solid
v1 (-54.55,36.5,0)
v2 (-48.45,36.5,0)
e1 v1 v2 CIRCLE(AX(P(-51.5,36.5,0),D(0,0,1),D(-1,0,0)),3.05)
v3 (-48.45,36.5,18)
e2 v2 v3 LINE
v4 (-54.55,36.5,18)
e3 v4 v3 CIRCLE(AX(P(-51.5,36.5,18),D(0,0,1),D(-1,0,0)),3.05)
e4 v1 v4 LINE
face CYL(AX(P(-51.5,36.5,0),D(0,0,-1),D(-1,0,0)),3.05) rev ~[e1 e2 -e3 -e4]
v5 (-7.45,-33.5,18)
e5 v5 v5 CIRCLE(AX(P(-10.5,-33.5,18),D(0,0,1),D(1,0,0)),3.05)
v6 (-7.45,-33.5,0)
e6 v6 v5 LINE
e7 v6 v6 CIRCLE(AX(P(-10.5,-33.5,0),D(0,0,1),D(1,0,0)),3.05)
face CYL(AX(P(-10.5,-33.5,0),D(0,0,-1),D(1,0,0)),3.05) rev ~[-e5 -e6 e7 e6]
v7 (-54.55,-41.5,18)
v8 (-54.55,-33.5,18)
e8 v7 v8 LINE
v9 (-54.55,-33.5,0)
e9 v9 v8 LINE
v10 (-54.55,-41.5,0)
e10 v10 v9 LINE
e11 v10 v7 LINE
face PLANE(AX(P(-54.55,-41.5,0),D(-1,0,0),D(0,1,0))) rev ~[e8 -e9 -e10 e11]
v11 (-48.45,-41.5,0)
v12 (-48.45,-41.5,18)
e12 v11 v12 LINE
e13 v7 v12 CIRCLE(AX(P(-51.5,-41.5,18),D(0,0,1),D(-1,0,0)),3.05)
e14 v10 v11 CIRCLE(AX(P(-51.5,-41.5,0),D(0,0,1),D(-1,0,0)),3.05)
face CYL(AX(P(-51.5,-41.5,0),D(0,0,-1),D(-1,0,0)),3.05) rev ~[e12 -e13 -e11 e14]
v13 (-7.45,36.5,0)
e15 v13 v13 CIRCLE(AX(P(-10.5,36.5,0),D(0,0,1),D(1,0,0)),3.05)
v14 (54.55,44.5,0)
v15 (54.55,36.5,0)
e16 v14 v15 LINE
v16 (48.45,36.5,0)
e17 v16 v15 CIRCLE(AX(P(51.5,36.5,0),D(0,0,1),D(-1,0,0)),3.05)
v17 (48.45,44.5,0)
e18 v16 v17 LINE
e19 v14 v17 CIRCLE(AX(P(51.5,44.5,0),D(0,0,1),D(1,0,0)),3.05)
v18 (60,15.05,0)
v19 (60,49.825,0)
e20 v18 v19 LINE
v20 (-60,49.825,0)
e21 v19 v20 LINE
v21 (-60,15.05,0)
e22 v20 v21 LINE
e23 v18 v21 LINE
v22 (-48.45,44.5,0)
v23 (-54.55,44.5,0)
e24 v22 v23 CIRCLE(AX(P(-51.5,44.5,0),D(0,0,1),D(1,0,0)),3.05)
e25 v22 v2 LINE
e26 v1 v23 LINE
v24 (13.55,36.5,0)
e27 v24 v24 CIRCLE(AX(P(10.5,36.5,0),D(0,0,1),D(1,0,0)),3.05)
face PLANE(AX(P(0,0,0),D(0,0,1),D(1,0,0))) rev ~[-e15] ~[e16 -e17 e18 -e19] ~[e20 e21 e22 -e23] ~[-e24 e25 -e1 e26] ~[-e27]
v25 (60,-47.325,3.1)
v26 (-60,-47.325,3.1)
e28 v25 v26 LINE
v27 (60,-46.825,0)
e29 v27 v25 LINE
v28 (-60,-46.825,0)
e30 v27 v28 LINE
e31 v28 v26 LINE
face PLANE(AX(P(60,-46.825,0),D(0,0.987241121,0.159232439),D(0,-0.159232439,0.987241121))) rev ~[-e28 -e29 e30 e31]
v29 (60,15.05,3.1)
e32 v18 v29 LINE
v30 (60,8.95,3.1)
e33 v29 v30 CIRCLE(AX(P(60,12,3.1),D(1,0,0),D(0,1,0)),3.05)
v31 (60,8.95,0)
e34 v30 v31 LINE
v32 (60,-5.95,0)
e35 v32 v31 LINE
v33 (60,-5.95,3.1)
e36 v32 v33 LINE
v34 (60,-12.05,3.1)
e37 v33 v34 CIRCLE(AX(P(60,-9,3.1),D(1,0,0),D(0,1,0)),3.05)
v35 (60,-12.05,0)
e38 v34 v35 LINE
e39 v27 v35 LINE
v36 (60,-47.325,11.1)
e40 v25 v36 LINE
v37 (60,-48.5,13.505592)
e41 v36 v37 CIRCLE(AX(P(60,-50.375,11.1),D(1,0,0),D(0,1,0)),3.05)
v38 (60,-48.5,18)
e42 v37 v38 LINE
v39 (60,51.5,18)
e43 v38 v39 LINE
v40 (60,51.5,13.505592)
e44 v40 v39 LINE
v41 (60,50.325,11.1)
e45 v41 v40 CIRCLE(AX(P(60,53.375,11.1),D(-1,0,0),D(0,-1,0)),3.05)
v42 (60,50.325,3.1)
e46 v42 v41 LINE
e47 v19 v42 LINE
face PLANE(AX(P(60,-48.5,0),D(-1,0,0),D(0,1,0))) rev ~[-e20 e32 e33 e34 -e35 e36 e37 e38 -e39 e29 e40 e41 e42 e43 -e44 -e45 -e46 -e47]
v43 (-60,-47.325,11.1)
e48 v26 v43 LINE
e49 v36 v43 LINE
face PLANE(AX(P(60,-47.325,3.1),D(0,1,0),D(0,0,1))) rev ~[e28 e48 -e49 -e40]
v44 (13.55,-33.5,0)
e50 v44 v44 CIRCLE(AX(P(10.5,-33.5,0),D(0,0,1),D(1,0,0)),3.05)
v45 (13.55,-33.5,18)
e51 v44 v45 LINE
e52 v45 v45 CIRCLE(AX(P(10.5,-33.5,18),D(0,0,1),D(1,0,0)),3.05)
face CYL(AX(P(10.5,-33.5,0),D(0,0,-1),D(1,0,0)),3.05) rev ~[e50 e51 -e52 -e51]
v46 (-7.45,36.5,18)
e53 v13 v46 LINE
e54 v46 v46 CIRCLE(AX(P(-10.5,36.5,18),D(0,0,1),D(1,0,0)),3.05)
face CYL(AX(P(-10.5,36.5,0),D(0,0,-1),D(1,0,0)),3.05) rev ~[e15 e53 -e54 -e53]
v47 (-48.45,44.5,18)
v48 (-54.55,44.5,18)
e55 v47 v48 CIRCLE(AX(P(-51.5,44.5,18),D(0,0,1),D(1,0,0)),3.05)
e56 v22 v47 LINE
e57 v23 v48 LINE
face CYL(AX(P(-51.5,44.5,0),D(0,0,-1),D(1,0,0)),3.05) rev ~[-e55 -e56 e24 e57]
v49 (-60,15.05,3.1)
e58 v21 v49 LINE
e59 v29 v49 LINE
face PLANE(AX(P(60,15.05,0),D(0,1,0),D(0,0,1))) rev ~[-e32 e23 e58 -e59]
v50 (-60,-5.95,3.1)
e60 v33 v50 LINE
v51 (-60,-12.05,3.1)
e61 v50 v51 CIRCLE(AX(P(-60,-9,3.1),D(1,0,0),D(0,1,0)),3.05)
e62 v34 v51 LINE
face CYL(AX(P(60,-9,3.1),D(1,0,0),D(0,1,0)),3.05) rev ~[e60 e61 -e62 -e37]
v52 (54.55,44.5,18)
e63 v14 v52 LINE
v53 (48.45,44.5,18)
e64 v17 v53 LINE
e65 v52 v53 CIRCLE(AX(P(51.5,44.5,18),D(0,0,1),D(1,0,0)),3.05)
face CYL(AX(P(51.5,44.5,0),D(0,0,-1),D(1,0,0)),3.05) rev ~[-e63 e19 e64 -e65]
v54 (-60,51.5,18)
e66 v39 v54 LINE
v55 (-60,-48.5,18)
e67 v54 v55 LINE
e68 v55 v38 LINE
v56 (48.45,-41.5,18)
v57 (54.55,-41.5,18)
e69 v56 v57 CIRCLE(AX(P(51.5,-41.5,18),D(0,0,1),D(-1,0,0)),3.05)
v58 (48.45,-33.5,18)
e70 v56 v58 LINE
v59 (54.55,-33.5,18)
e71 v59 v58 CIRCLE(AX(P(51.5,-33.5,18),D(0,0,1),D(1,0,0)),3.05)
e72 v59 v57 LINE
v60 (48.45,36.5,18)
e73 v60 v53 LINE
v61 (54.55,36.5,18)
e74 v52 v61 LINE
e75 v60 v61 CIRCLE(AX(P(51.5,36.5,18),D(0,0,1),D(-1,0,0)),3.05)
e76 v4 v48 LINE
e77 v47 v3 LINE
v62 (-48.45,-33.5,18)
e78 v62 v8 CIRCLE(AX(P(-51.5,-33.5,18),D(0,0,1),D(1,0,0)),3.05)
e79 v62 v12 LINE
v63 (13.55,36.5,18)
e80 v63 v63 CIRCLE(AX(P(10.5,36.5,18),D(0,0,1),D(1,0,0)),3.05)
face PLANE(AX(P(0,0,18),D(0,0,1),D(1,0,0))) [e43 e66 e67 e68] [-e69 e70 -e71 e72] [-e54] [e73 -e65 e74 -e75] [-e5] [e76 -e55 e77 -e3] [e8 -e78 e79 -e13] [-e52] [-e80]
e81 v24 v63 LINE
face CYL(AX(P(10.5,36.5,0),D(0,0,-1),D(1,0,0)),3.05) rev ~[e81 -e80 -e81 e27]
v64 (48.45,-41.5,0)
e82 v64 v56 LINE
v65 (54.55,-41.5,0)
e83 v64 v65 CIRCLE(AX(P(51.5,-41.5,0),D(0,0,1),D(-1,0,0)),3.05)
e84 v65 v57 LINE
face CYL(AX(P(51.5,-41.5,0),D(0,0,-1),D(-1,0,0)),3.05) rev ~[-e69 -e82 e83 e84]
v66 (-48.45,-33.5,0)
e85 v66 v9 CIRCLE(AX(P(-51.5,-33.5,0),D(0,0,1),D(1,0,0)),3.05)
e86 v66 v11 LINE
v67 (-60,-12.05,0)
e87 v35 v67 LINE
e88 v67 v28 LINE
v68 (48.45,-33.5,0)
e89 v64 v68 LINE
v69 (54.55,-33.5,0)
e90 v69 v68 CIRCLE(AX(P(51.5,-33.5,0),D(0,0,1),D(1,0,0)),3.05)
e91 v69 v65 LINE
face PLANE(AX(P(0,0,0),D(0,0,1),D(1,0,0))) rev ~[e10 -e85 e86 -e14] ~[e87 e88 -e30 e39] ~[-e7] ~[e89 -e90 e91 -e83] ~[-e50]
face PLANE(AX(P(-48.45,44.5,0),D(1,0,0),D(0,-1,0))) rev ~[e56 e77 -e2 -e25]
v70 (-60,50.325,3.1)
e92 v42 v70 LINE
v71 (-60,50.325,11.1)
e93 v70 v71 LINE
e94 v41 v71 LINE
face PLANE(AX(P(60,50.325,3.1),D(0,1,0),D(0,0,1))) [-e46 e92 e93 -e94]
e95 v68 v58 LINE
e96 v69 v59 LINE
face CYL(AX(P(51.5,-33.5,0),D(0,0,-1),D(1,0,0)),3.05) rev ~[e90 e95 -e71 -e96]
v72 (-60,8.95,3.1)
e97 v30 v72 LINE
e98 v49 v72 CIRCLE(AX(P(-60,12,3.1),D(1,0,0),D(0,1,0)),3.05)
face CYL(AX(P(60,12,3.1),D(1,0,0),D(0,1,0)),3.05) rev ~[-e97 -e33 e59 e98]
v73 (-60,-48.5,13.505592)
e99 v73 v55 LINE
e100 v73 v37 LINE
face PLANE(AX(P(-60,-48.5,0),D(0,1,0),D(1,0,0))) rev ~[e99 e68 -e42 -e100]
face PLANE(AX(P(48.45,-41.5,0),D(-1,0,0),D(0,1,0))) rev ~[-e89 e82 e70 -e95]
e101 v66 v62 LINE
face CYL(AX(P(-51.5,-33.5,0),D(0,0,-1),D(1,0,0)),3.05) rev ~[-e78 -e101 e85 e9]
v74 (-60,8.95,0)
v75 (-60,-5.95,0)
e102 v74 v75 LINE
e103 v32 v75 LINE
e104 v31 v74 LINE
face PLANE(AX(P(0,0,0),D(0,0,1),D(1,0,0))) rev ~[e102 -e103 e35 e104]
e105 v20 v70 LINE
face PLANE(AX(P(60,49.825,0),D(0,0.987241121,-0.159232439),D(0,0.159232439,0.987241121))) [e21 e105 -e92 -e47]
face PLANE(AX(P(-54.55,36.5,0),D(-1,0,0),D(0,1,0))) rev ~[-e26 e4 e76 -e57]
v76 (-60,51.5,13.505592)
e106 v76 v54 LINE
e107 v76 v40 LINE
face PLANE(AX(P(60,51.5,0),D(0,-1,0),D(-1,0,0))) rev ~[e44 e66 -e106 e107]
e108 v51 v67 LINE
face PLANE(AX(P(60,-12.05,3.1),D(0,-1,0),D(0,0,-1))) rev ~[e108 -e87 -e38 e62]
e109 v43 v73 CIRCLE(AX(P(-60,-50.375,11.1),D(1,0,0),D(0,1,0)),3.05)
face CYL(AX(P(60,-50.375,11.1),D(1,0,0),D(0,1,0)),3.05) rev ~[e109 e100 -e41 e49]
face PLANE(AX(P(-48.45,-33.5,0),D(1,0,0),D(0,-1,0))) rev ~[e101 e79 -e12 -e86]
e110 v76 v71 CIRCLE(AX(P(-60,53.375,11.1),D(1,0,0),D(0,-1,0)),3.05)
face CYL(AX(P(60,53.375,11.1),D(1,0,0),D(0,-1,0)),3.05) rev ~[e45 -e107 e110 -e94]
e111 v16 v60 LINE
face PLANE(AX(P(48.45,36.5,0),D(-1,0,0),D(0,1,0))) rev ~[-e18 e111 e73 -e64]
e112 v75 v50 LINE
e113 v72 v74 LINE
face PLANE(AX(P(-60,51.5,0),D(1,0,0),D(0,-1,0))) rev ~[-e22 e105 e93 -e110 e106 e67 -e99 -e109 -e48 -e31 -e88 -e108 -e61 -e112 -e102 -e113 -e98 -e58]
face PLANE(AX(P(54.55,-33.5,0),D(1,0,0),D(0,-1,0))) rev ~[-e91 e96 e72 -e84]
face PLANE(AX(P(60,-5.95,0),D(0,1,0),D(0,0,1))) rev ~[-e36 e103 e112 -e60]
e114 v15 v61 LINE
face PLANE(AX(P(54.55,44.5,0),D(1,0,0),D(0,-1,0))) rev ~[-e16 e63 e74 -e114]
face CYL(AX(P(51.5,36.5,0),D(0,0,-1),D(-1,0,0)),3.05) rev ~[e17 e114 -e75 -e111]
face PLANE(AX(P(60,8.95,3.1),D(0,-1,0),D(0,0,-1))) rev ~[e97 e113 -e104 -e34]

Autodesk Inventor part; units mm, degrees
ref_plane "YZ Plane" through (0, 0, 0) normal (1, 0, 0) x (0, 1, 0)
ref_plane "XZ Plane" through (0, 0, 0) normal (0, 1, 0) x (-1, 0, 0)
ref_plane "XY Plane" through (0, 0, 0) normal (0, 0, 1) x (1, 0, 0)
sketch "Sketch1" plane through (0, 0, 0) normal (0, 0, 1) x (1, 0, 0)
  circle A0 centre (10.5, 36.5) radius 3.05 projected
  circle A1 centre (-10.5, 36.5) radius 3.05 projected
  circle A2 centre (-10.5, -33.5) radius 3.05 projected
  circle A3 centre (10.5, -33.5) radius 3.05 projected
  line L0 (60, 51.5) -> (-60, 51.5) projected
  line L1 (-60, 51.5) -> (-60, -48.5) projected
  line L2 (-60, -48.5) -> (60, -48.5) projected
  line L3 (60, -48.5) -> (60, 51.5) projected
  circle A4 centre (51.5, 8.625) radius 3.05 projected
  circle A5 centre (-51.5, -5.625) radius 3.05 projected
  circle A6 centre (51.5, -5.625) radius 3.05 projected
  circle A7 centre (-51.5, 8.625) radius 3.05 projected
  arc A8 (-54.55, 36.5) -> (-48.45, 36.5) centre (-51.5, 36.5) ccw projected
  arc A9 (48.45, 36.5) -> (54.55, 36.5) centre (51.5, 36.5) ccw projected
  arc A10 (54.55, -33.5) -> (48.45, -33.5) centre (51.5, -33.5) ccw projected
  arc A11 (-48.45, -33.5) -> (-54.55, -33.5) centre (-51.5, -33.5) ccw projected
  arc A12 (-13.55, 8.625) -> (-7.45, 8.625) centre (-10.5, 8.625) ccw projected
  arc A13 (13.55, -5.625) -> (7.45, -5.625) centre (10.5, -5.625) ccw projected
  arc A14 (-7.45, -5.625) -> (-13.55, -5.625) centre (-10.5, -5.625) ccw projected
  arc A15 (7.45, 8.625) -> (13.55, 8.625) centre (10.5, 8.625) ccw projected
  line L4 (-48.45, -33.5) -> (-48.45, -41.5) projected
  arc A16 (-54.55, -41.5) -> (-48.45, -41.5) centre (-51.5, -41.5) ccw projected
  line L5 (-54.55, -41.5) -> (-54.55, -33.5) projected
  line L6 (54.55, -33.5) -> (54.55, -41.5) projected
  arc A17 (48.45, -41.5) -> (54.55, -41.5) centre (51.5, -41.5) ccw projected
  line L7 (48.45, -41.5) -> (48.45, -33.5) projected
  line L8 (-54.55, 36.5) -> (-54.55, 44.5) projected
  arc A18 (-48.45, 44.5) -> (-54.55, 44.5) centre (-51.5, 44.5) ccw projected
  line L9 (-48.45, 44.5) -> (-48.45, 36.5) projected
  line L10 (-7.45, -5.625) -> (-7.45, -13.625) projected
  arc A19 (-13.55, -13.625) -> (-7.45, -13.625) centre (-10.5, -13.625) ccw projected
  line L11 (-13.55, -13.625) -> (-13.55, -5.625) projected
  line L12 (13.55, -5.625) -> (13.55, -13.625) projected
  arc A20 (7.45, -13.625) -> (13.55, -13.625) centre (10.5, -13.625) ccw projected
  line L13 (7.45, -13.625) -> (7.45, -5.625) projected
  line L14 (13.55, 16.625) -> (13.55, 8.625) projected
  line L15 (7.45, 8.625) -> (7.45, 16.625) projected
  arc A21 (13.55, 16.625) -> (7.45, 16.625) centre (10.5, 16.625) ccw projected
  line L16 (54.55, 44.5) -> (54.55, 36.5) projected
  line L17 (48.45, 36.5) -> (48.45, 44.5) projected
  arc A22 (54.55, 44.5) -> (48.45, 44.5) centre (51.5, 44.5) ccw projected
  line L18 (-7.45, 16.625) -> (-7.45, 8.625) projected
  line L19 (-13.55, 8.625) -> (-13.55, 16.625) projected
  arc A23 (-7.45, 16.625) -> (-13.55, 16.625) centre (-10.5, 16.625) ccw projected
  point P0 (0, 0)
  point P1 (-51.375, 35)
  point P2 (51.375, 35)
  point P3 (51.375, -35)
  point P4 (-51.375, -35)
  point P5 (-10.5, 7.125)
  point P6 (10.5, -7.125)
  point P7 (-10.5, -7.125)
  point P8 (10.5, 7.125)
extrude "Extrusion1" add sketch "Sketch1" along normal blind 18 contours L3 L2 L1 L0 | A4 | A5 | A6 | A7 | L19 A23 L18 A12 | L12 A20 L13 A13 | L10 A19 L11 A14 | L15 A21 L14 A15
sketch "Sketch2" plane through (60, -48.5, 0) normal (1, 0, 0) x (0, 0, -1)
  arc A0 (-3.1, 63.55) -> (-3.1, 57.45) centre (-3.1, 60.5) ccw
  arc A1 (-3.1, 42.55) -> (-3.1, 36.45) centre (-3.1, 39.5) ccw
  line L0 (0, 0) -> (0, 100) projected
  line L1 (0, 100) -> (-18, 100) projected
  line L2 (-18, 0) -> (-18, 100) projected
  line L3 (0, 0) -> (-18, 0) projected
  circle A2 centre (66.9, 39.625) radius 3.05 construction
  circle A3 centre (66.9, 60.375) radius 3.05 construction
  circle A4 centre (-3.1, 60.375) radius 3.05 construction
  circle A5 centre (-3.1, 39.625) radius 3.05 construction
  line L4 (81.9, -10) -> (81.9, 110) construction
  line L5 (81.9, 110) -> (-18.1, 110) construction
  line L6 (-18.1, 110) -> (-18.1, -10) construction
  line L7 (-18.1, -10) -> (81.9, -10) construction
  line L8 (-3.1, -4.425) -> (0, -4.425)
  line L9 (0, -4.425) -> (0, 1.675)
  line L10 (0, 1.675) -> (-3.1, 1.675)
  line L11 (0, 100) -> (0, 0) projected
  line L12 (-3.1, 36.45) -> (0, 36.45)
  line L13 (0, 36.45) -> (0, 42.55)
  line L14 (0, 42.55) -> (-3.1, 42.55)
  line L15 (-3.1, 57.45) -> (0, 57.45)
  line L16 (0, 57.45) -> (0, 63.55)
  line L17 (0, 63.55) -> (-3.1, 63.55)
  line L18 (-3.1, 98.325) -> (0, 98.325)
  line L19 (0, 98.325) -> (0, 104.425)
  line L20 (0, 104.425) -> (-3.1, 104.425)
  line L21 (-3.1, -1.375) -> (-3.1, 101.375) construction
  line L22 (-3.1, 60.5) -> (-3.1, 39.5) construction
  circle A6 centre (39.025, -1.875) radius 3.05 projected
  circle A7 centre (24.775, 101.875) radius 3.05 projected
  circle A8 centre (24.775, -1.875) radius 3.05 projected
  circle A9 centre (39.025, 101.875) radius 3.05 projected
  arc A10 (66.9, 104.925) -> (66.9, 98.825) centre (66.9, 101.875) ccw projected
  arc A11 (66.9, 1.175) -> (66.9, -4.925) centre (66.9, -1.875) ccw projected
  arc A12 (-3.1, -4.925) -> (-3.1, 1.175) centre (-3.1, -1.875) ccw projected
  arc A13 (-3.1, 98.825) -> (-3.1, 104.925) centre (-3.1, 101.875) ccw projected
  arc A14 (39.025, 63.425) -> (39.025, 57.325) centre (39.025, 60.375) ccw projected
  arc A15 (24.775, 36.575) -> (24.775, 42.675) centre (24.775, 39.625) ccw projected
  arc A16 (24.775, 57.325) -> (24.775, 63.425) centre (24.775, 60.375) ccw projected
  arc A17 (39.025, 42.675) -> (39.025, 36.575) centre (39.025, 39.625) ccw projected
  line L23 (-3.1, 98.825) -> (-11.1, 98.825) projected
  arc A18 (-11.1, 104.925) -> (-11.1, 98.825) centre (-11.1, 101.875) ccw projected
  line L24 (-11.1, 104.925) -> (-3.1, 104.925) projected
  line L25 (-3.1, -4.925) -> (-11.1, -4.925) projected
  arc A19 (-11.1, 1.175) -> (-11.1, -4.925) centre (-11.1, -1.875) ccw projected
  line L26 (-11.1, 1.175) -> (-3.1, 1.175) projected
  line L27 (66.9, 104.925) -> (74.9, 104.925) projected
  arc A20 (74.9, 98.825) -> (74.9, 104.925) centre (74.9, 101.875) ccw projected
  line L28 (74.9, 98.825) -> (66.9, 98.825) projected
  line L29 (24.775, 57.325) -> (16.775, 57.325) projected
  arc A21 (16.775, 63.425) -> (16.775, 57.325) centre (16.775, 60.375) ccw projected
  line L30 (16.775, 63.425) -> (24.775, 63.425) projected
  line L31 (24.775, 36.575) -> (16.775, 36.575) projected
  arc A22 (16.775, 42.675) -> (16.775, 36.575) centre (16.775, 39.625) ccw projected
  line L32 (16.775, 42.675) -> (24.775, 42.675) projected
  line L33 (47.025, 36.575) -> (39.025, 36.575) projected
  line L34 (39.025, 42.675) -> (47.025, 42.675) projected
  arc A23 (47.025, 36.575) -> (47.025, 42.675) centre (47.025, 39.625) ccw projected
  line L35 (74.9, -4.925) -> (66.9, -4.925) projected
  line L36 (66.9, 1.175) -> (74.9, 1.175) projected
  arc A24 (74.9, -4.925) -> (74.9, 1.175) centre (74.9, -1.875) ccw projected
  line L37 (47.025, 57.325) -> (39.025, 57.325) projected
  line L38 (39.025, 63.425) -> (47.025, 63.425) projected
  arc A25 (47.025, 57.325) -> (47.025, 63.425) centre (47.025, 60.375) ccw projected
  point P0 (0, 48.5)
  point P1 (-3.1, 50)
  point P2 (-18, 50)
  point P3 (-3.1, 50)
  point P4 (-3.1, 50)
  point P5 (-3.1, 50)
  point P6 (-3.1, 50)
  point P7 (66.9, 101.375)
  point P8 (66.9, -1.375)
  point P9 (-3.1, -1.375)
  point P10 (-3.1, 101.375)
  point P11 (39.025, 60.5)
  point P12 (24.775, 39.5)
  point P13 (24.775, 60.5)
  point P14 (39.025, 39.5)
  dimension "d2" = 6.1
  dimension "d3" = 3.1
  dimension "d4" = 21
  dimension "d5" = 102.75
  dimension "d6" = 6.1
  dimension "d7" = 6.1
  dimension "d8" = 6.1
sketch "Sketch2 outline for Extrusion2" plane through (60, -48.5, 0) normal (1, 0, 0) x (0, 0, -1)
  line L0 (-11.1, -4.925) -> (-3.1, -4.925)
  arc A0 (-11.1, 1.175) -> (-11.1, -4.925) centre (-11.1, -1.875) ccw
  line L1 (-3.1, 1.175) -> (-11.1, 1.175)
  line L2 (0, 1.675) -> (-3.1, 1.175)
  line L3 (0, -4.425) -> (0, 1.675)
  line L4 (-3.1, -4.925) -> (0, -4.425)
  line L5 (0, 104.425) -> (0, 98.325)
  line L6 (0, 98.325) -> (-3.1, 98.825)
  line L7 (-3.1, 98.825) -> (-11.1, 98.825)
  arc A1 (-11.1, 98.825) -> (-11.1, 104.925) centre (-11.1, 101.875) cw
  line L8 (-11.1, 104.925) -> (-3.1, 104.925)
  line L9 (-3.1, 104.925) -> (0, 104.425)
  line L10 (0, 36.45) -> (0, 42.55)
  line L11 (-3.1, 36.45) -> (0, 36.45)
  arc A2 (-3.1, 42.55) -> (-3.1, 36.45) centre (-3.1, 39.5) ccw
  line L12 (0, 42.55) -> (-3.1, 42.55)
  line L13 (0, 57.45) -> (0, 63.55)
  line L14 (-3.1, 57.45) -> (0, 57.45)
  arc A3 (-3.1, 63.55) -> (-3.1, 57.45) centre (-3.1, 60.5) ccw
  line L15 (0, 63.55) -> (-3.1, 63.55)
extrude "Extrusion2" cut sketch "Sketch2 outline for Extrusion2" against normal through all
properties part number "AXYZ" material "PC/ABS Plastic"
